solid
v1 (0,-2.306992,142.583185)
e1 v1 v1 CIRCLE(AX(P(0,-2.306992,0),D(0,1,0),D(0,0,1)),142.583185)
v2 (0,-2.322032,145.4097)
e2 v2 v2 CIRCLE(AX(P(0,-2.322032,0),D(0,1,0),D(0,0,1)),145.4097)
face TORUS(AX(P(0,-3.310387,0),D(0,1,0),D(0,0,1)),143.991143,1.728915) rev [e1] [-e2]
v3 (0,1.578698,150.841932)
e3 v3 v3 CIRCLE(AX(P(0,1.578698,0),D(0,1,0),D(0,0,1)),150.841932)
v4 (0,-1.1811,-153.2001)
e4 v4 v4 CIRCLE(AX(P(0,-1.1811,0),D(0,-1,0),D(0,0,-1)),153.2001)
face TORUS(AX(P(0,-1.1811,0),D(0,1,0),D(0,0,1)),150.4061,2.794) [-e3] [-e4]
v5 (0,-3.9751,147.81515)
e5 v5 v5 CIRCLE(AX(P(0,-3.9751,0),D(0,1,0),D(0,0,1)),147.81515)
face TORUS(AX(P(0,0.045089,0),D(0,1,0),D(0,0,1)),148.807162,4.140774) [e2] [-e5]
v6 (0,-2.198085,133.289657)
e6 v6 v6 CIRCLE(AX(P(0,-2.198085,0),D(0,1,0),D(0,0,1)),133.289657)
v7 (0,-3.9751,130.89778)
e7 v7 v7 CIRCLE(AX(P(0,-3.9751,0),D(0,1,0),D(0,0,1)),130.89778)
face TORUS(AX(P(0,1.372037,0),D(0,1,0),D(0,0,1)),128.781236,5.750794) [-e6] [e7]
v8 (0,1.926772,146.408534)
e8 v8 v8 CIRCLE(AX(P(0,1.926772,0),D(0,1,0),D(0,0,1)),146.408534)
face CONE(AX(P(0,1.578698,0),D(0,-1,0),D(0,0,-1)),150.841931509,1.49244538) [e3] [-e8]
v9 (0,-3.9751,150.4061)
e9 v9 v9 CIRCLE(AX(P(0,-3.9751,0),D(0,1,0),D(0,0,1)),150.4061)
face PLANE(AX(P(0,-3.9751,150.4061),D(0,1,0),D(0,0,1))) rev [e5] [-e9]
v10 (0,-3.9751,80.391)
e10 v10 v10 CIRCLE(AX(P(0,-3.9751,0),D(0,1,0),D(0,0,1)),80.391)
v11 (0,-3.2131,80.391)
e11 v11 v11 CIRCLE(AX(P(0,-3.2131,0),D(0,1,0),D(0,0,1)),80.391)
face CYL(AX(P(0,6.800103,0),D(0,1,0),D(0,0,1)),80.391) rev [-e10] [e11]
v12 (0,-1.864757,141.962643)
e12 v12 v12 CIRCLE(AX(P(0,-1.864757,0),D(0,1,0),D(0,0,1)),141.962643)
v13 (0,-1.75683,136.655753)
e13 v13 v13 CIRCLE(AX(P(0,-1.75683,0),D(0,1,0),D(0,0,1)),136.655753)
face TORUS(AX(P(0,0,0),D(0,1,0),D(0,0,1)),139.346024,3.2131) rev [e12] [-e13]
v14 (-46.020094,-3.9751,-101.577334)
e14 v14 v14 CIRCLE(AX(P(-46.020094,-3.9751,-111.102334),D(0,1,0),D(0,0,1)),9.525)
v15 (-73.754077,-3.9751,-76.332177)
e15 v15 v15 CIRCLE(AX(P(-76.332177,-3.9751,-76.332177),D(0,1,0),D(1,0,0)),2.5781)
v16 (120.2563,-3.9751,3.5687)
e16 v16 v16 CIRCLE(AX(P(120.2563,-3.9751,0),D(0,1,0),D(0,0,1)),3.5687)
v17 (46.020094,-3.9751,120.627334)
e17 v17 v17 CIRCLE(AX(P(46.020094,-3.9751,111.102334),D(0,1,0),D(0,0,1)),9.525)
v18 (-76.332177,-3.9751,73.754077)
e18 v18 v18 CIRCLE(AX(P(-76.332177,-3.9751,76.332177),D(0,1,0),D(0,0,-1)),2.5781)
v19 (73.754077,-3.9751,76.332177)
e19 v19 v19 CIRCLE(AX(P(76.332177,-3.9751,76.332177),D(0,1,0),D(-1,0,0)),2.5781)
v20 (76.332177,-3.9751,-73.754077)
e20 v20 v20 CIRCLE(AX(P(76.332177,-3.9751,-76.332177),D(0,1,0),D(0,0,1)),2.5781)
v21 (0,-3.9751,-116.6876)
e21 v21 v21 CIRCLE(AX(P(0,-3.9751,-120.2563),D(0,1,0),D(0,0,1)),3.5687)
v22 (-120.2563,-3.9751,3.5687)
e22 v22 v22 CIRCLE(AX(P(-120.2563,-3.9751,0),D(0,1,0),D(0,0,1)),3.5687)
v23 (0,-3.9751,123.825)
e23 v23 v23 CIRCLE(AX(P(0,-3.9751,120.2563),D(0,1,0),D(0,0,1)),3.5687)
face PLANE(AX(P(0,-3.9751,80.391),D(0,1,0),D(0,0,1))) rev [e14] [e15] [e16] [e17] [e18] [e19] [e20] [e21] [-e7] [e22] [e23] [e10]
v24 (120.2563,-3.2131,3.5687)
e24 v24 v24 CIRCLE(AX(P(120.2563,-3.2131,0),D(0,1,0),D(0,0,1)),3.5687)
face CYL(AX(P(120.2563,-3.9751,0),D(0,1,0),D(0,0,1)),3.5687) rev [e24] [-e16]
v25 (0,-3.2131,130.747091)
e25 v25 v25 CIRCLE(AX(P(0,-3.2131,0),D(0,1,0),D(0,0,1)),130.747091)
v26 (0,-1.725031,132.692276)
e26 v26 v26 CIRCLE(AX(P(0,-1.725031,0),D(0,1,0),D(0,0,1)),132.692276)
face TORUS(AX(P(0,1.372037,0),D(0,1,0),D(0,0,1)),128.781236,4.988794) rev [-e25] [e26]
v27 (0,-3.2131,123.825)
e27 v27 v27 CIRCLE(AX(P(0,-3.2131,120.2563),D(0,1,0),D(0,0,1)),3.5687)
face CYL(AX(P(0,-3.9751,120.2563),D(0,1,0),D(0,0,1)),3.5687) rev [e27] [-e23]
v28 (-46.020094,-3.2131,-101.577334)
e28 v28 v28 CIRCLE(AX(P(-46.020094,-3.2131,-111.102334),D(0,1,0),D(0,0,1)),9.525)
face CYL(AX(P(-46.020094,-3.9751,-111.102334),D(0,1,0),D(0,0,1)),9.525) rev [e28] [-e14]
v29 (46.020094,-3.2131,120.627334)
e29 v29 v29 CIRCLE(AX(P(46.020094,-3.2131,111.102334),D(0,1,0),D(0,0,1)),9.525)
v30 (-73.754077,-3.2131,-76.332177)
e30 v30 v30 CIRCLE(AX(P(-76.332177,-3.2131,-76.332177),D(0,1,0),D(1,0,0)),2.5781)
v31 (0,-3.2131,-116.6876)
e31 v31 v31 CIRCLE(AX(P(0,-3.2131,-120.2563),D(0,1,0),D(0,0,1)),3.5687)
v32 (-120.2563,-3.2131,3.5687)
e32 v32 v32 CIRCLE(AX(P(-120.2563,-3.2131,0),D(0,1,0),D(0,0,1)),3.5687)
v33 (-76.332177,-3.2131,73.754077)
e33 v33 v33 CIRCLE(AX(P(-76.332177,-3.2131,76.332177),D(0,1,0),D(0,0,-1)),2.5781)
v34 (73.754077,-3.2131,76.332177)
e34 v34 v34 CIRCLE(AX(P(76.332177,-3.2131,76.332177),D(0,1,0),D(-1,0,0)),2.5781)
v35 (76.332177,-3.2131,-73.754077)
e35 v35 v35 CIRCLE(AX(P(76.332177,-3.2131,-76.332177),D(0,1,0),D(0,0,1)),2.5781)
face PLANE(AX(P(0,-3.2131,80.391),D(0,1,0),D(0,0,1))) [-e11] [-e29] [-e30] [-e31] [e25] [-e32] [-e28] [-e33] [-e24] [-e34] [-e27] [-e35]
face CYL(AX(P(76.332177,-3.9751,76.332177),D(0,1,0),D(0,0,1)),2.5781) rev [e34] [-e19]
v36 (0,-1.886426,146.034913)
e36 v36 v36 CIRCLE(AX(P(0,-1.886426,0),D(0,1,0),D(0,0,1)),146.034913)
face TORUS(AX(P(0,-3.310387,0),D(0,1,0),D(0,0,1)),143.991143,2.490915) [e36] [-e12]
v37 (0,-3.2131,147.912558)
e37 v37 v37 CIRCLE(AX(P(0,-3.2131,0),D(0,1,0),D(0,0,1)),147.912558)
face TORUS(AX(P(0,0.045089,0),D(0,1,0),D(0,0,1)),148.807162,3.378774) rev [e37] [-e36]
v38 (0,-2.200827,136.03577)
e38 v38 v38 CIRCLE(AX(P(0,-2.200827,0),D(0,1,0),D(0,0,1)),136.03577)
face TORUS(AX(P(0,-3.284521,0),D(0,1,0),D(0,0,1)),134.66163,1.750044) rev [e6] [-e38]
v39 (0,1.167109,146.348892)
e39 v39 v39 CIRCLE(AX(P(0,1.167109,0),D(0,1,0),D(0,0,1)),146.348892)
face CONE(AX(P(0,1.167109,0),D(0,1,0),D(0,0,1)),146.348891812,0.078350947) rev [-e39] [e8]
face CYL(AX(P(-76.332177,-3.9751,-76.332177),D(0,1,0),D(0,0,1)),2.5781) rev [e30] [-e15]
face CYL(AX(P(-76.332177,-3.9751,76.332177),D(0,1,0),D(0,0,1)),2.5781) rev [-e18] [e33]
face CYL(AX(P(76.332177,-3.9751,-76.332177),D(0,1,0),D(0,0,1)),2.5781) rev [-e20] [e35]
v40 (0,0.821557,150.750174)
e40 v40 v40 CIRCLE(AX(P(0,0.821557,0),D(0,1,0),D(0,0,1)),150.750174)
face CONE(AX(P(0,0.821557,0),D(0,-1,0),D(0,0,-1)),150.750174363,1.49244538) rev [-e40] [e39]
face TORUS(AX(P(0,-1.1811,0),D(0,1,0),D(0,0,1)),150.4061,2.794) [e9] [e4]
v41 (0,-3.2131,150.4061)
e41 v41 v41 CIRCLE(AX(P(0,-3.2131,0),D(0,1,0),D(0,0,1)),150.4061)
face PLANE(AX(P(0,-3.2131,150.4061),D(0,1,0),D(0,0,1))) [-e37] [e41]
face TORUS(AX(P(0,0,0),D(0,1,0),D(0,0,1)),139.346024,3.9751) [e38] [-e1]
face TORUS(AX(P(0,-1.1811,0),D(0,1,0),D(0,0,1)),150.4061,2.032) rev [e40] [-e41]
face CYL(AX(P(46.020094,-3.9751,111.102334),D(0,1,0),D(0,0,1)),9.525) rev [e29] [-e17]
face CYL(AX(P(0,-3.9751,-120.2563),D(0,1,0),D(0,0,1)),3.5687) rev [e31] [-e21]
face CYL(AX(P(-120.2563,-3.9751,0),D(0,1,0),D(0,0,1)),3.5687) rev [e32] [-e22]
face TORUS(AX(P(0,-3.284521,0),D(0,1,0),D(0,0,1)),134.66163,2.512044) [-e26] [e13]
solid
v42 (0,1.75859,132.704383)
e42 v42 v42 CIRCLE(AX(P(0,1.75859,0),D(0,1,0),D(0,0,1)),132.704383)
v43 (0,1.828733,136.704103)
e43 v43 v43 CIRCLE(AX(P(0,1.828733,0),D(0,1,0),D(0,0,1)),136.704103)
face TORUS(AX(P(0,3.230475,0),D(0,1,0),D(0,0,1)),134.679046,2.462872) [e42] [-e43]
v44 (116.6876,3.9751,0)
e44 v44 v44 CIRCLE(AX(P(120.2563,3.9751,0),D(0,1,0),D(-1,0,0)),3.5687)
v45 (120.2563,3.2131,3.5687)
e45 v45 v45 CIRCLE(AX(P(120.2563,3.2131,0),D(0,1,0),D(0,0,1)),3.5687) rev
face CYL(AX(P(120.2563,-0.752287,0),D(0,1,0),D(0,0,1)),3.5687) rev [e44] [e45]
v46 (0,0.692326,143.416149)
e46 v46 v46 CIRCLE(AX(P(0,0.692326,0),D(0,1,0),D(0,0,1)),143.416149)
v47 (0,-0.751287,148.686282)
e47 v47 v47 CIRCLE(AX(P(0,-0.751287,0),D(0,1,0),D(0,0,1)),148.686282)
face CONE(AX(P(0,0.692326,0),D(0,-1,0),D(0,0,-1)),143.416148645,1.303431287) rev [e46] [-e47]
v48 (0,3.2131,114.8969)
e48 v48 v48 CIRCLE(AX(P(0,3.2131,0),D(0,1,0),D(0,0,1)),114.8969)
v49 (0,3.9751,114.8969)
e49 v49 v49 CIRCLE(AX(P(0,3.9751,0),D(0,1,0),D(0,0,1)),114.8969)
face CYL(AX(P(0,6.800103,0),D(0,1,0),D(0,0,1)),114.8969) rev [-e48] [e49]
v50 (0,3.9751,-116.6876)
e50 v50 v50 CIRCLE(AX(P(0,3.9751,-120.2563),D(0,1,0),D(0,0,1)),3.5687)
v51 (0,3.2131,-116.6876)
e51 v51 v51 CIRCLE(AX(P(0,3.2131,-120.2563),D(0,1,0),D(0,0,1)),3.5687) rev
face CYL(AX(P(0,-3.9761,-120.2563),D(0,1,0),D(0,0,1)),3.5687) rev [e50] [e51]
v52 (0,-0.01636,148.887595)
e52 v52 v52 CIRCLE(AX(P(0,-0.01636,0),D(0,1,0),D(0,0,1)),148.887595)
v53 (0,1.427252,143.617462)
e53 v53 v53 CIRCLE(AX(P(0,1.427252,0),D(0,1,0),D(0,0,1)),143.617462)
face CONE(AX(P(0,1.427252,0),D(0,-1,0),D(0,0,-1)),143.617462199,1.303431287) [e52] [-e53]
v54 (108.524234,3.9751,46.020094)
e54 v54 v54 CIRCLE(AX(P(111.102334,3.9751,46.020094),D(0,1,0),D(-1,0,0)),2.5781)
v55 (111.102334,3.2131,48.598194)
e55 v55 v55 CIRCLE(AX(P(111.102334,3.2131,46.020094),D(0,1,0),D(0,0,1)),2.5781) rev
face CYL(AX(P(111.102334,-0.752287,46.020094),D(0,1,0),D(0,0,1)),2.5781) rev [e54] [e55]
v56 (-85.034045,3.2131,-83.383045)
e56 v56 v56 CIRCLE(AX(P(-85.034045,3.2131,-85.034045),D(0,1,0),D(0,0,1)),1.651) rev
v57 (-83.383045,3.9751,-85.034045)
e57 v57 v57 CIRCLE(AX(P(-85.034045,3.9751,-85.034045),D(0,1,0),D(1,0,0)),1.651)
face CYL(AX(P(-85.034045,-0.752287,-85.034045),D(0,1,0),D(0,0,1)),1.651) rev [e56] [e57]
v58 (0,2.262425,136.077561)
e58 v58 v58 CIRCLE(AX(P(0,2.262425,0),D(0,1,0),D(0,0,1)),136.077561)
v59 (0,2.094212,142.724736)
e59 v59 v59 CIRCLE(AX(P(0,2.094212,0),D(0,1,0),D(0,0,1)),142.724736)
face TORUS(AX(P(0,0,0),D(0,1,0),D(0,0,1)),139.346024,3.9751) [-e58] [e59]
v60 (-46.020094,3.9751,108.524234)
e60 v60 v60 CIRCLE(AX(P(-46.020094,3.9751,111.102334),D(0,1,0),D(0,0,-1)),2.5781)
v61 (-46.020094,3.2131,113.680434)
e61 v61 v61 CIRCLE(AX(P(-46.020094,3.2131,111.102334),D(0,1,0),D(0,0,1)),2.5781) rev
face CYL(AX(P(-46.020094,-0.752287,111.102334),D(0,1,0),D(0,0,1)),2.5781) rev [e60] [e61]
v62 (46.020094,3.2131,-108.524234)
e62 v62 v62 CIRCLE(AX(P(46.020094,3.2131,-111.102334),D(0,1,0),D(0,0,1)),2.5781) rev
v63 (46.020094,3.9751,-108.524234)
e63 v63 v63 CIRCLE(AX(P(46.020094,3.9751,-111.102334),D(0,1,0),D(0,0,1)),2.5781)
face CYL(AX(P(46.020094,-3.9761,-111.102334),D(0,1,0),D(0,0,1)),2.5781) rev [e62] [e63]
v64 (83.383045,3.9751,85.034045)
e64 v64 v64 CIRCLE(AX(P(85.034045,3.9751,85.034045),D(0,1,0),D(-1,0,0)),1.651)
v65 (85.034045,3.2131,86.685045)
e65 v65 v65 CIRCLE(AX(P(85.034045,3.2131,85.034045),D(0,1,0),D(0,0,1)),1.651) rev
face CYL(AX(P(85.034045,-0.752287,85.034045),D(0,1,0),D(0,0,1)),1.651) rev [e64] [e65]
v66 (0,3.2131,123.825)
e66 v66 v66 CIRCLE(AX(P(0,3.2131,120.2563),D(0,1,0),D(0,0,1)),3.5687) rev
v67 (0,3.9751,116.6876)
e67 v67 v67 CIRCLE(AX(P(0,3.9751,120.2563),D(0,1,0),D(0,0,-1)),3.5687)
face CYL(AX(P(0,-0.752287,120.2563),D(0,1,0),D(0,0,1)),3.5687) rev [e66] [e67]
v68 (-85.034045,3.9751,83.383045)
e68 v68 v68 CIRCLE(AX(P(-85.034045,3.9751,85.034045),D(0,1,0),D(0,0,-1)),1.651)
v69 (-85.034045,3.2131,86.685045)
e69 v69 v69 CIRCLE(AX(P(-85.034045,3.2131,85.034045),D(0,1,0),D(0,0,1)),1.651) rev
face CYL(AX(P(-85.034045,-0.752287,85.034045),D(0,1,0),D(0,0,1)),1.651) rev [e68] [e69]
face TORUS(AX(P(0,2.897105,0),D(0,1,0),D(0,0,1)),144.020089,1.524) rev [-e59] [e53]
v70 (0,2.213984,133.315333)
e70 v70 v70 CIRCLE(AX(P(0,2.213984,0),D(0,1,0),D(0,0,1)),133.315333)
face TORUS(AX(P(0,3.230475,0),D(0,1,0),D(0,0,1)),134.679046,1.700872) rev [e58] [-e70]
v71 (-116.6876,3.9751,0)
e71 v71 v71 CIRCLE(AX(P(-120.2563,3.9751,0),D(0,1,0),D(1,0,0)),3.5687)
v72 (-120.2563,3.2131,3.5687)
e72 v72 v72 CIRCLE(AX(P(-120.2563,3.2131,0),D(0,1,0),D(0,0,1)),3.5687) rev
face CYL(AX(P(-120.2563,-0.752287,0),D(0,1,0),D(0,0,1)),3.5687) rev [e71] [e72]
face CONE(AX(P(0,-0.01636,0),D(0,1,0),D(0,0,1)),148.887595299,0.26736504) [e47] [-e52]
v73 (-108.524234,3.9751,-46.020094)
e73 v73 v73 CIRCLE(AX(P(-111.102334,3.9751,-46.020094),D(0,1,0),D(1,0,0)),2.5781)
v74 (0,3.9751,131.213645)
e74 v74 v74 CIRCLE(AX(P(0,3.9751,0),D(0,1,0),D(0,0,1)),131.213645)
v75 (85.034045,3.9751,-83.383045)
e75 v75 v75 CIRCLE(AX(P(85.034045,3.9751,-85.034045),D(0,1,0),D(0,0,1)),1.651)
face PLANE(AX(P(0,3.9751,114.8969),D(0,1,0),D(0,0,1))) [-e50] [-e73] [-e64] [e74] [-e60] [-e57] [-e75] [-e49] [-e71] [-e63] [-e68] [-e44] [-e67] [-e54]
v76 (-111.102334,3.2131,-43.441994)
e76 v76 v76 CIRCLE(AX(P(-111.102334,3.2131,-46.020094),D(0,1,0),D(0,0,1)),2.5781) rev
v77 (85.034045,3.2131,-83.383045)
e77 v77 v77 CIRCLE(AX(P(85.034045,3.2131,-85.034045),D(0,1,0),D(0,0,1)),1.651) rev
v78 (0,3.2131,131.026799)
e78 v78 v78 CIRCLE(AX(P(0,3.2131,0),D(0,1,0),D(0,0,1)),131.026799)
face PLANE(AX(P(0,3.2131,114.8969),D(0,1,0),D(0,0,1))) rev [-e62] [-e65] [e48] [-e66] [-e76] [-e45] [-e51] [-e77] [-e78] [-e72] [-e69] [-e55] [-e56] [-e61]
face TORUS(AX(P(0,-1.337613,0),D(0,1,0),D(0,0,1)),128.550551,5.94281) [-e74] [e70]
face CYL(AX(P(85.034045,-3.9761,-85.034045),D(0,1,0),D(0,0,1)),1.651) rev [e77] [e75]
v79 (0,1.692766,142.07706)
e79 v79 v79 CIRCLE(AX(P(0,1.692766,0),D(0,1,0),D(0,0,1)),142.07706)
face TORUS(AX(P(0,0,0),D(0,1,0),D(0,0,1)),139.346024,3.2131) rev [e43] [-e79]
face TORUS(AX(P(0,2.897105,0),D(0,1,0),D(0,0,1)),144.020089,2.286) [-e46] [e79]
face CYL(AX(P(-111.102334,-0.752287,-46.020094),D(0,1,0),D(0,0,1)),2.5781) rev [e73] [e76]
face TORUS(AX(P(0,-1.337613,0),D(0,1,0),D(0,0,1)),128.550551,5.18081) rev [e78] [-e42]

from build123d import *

# Parameters (mm, degrees)
SKETCH2_R          = 2.5781
CUT_EXTRUDE1_DEPTH = 217.77687045
CIRPATTERN1_COUNT  = 4
SKETCH3_R          = 3.5687
SKETCH3_R_2        = 2.5781
SKETCH3_R_3        = 1.651
CUT_EXTRUDE2_DEPTH = 0.762
CIRPATTERN2_COUNT  = 4
SKETCH4_R          = 9.525
CUT_EXTRUDE3_DEPTH = 217.77687045
SKETCH5_R          = 3.5687
CUT_EXTRUDE4_DEPTH = 217.77687045


# Read off the part's stored shape, not the designer's step: Revolve-Thin2
with BuildPart() as part:
    # Sketch1 → Revolve-Thin1 (revolve)
    with BuildSketch(Plane(origin=(0, 0, 0), x_dir=(0, -1, 0), z_dir=(-1, 0, 0))):
        with BuildLine():
            Line((-1.926771773, 146.408534167), (-1.578698343, 150.841931509))
            ThreePointArc((-1.578698343, 150.841931509), (1.399685714, 153.191536462), (3.9751, 150.4061))
            Line((3.9751, 150.4061), (3.9751, 147.815149845))
            ThreePointArc((3.9751, 147.815149845), (3.367531739, 146.461948013), (2.322032384, 145.409700185))
            ThreePointArc((2.322032384, 145.409700185), (1.58149611, 144.000342903), (2.306992277, 142.583184749))
            ThreePointArc((2.306992277, 142.583184749), (3.974577532, 139.281577214), (2.200826803, 136.035770497))
            ThreePointArc((2.200826803, 136.035770497), (1.534477775, 134.663377981), (2.198084705, 133.289657453))
            ThreePointArc((2.198084705, 133.289657453), (3.244200141, 132.210811353), (3.9751, 130.897779819))
            Line((3.9751, 130.897779819), (3.9751, 80.391))
            Line((3.9751, 80.391), (3.2131, 80.391))
            Line((3.2131, 80.391), (3.2131, 130.747090648))
            ThreePointArc((3.2131, 130.747090648), (2.590286323, 131.812417319), (1.725031282, 132.692276119))
            ThreePointArc((1.725031282, 132.692276119), (0.772557745, 134.681783815), (1.756830006, 136.655753124))
            ThreePointArc((1.756830006, 136.655753124), (3.212435734, 139.280692495), (1.864757335, 141.962642843))
            ThreePointArc((1.864757335, 141.962642843), (0.819506898, 144.004397507), (1.886426201, 146.034913152))
            ThreePointArc((1.886426201, 146.034913152), (2.714375531, 146.85742638), (3.2131, 147.912557654))
            Line((3.2131, 147.912557654), (3.2131, 150.4061))
            ThreePointArc((3.2131, 150.4061), (1.353761629, 152.430751072), (-0.821557443, 150.750174363))
            Line((-0.821557443, 150.750174363), (-1.167109486, 146.348891812))
            Line((-1.167109486, 146.348891812), (-1.926771773, 146.408534167))
        make_face()
    revolve(axis=Axis((0, 6.80010296, 0), (0, -1, 0)))

    # Sketch2 → Cut-Extrude1 (cut, through all)
    with BuildSketch(Plane(origin=(0, -3.2131, 0), x_dir=(-1, 0, 0), z_dir=(0, 1, 0))):
        with Locations(Location((-76.332177029, -76.332177029, 0), (0, 0, 90))):
            Circle(SKETCH2_R)
    cut_extrude1 = extrude(amount=-CUT_EXTRUDE1_DEPTH, mode=Mode.SUBTRACT)

    # CirPattern1: Cut-Extrude1 ×4 about axis
    cirpattern1_axis = Axis((0, 0, 0), (0, 1, 0))
    for i in range(1, CIRPATTERN1_COUNT):
        add(cut_extrude1.rotate(cirpattern1_axis, i * 360 / CIRPATTERN1_COUNT), mode=Mode.SUBTRACT)

    # Sketch4 → Cut-Extrude3 (cut, through all)
    with BuildSketch(Plane(origin=(0, -3.2131, 0), x_dir=(-1, 0, 0), z_dir=(0, 1, 0))):
        with Locations(Location((-46.020093648, 111.102334226, 0), (0, 0, 90))):
            Circle(SKETCH4_R)
        with Locations(Location((46.020093648, -111.102334226, 0), (0, 0, 90))):
            Circle(SKETCH4_R)
    extrude(amount=-CUT_EXTRUDE3_DEPTH, mode=Mode.SUBTRACT)

    # Sketch5 → Cut-Extrude4 (cut, through all)
    with BuildSketch(Plane(origin=(0, -3.2131, 0), x_dir=(-1, 0, 0), z_dir=(0, 1, 0))):
        with Locations(Location((120.2563, 0, 0), (0, 0, 90))):
            Circle(SKETCH5_R)
        with Locations(Location((0, -120.2563, 0), (0, 0, 90))):
            Circle(SKETCH5_R)
        with Locations(Location((-120.2563, 0, 0), (0, 0, 90))):
            Circle(SKETCH5_R)
        with Locations(Location((0, 120.2563, 0), (0, 0, 90))):
            Circle(SKETCH5_R)
    extrude(amount=-CUT_EXTRUDE4_DEPTH, mode=Mode.SUBTRACT)


with BuildPart() as body_2:
    # Revolve-Thin2 outline → Revolve-Thin2 (revolve)
    with BuildSketch(Plane.XY):
        with BuildLine():
            ThreePointArc((142.077060046, 1.692765877), (142.65188466, 1.065763639), (143.416148645, 0.692325956))
            Line((143.416148645, 0.692325956), (148.686281745, -0.75128688))
            Line((148.686281745, -0.75128688), (148.887595299, -0.016360453))
            Line((148.887595299, -0.016360453), (143.617462199, 1.427252383))
            ThreePointArc((143.617462199, 1.427252383), (143.107952875, 1.676210838), (142.724736466, 2.09421233))
            ThreePointArc((142.724736466, 2.09421233), (139.446585641, 3.97382781), (136.077560973, 2.262424884))
            ThreePointArc((136.077560973, 2.262424884), (134.70886921, 1.529864297), (133.31533326, 2.213983958))
            ThreePointArc((133.31533326, 2.213983958), (132.367450236, 3.217414), (131.213645225, 3.9751))
            Line((131.213645225, 3.9751), (114.8969, 3.9751))
            Line((114.8969, 3.9751), (114.8969, 3.2131))
            Line((114.8969, 3.2131), (131.026798797, 3.2131))
            ThreePointArc((131.026798797, 3.2131), (131.944426003, 2.576771343), (132.704382538, 1.758590486))
            ThreePointArc((132.704382538, 1.758590486), (134.722230277, 0.767981444), (136.704103497, 1.828733213))
            ThreePointArc((136.704103497, 1.828733213), (139.42730874, 3.21207168), (142.077060046, 1.692765877))
        make_face()
    revolve(axis=Axis((0, 0, 0), (0, 1, 0)))

    # Sketch3 → Cut-Extrude2 (cut)
    with BuildSketch(Plane(origin=(0, 3.9751, 0), x_dir=(-1, 0, 0), z_dir=(0, 1, 0))):
        with Locations(Location((0, -120.2563, 0), (0, 0, 90))):
            Circle(SKETCH3_R)
        with Locations(Location((-46.020093648, -111.102334226, 0), (0, 0, 90))):
            Circle(SKETCH3_R_2)
        with Locations(Location((-85.03404521, -85.03404521, 0), (0, 0, 90))):
            Circle(SKETCH3_R_3)
    cut_extrude2 = extrude(amount=-CUT_EXTRUDE2_DEPTH, mode=Mode.SUBTRACT)

    # CirPattern2: Cut-Extrude2 ×4 about axis
    cirpattern2_axis = Axis((0, 0, 0), (0, 1, 0))
    for i in range(1, CIRPATTERN2_COUNT):
        add(cut_extrude2.rotate(cirpattern2_axis, i * 360 / CIRPATTERN2_COUNT), mode=Mode.SUBTRACT)


solid = Compound([part.part, body_2.part])
